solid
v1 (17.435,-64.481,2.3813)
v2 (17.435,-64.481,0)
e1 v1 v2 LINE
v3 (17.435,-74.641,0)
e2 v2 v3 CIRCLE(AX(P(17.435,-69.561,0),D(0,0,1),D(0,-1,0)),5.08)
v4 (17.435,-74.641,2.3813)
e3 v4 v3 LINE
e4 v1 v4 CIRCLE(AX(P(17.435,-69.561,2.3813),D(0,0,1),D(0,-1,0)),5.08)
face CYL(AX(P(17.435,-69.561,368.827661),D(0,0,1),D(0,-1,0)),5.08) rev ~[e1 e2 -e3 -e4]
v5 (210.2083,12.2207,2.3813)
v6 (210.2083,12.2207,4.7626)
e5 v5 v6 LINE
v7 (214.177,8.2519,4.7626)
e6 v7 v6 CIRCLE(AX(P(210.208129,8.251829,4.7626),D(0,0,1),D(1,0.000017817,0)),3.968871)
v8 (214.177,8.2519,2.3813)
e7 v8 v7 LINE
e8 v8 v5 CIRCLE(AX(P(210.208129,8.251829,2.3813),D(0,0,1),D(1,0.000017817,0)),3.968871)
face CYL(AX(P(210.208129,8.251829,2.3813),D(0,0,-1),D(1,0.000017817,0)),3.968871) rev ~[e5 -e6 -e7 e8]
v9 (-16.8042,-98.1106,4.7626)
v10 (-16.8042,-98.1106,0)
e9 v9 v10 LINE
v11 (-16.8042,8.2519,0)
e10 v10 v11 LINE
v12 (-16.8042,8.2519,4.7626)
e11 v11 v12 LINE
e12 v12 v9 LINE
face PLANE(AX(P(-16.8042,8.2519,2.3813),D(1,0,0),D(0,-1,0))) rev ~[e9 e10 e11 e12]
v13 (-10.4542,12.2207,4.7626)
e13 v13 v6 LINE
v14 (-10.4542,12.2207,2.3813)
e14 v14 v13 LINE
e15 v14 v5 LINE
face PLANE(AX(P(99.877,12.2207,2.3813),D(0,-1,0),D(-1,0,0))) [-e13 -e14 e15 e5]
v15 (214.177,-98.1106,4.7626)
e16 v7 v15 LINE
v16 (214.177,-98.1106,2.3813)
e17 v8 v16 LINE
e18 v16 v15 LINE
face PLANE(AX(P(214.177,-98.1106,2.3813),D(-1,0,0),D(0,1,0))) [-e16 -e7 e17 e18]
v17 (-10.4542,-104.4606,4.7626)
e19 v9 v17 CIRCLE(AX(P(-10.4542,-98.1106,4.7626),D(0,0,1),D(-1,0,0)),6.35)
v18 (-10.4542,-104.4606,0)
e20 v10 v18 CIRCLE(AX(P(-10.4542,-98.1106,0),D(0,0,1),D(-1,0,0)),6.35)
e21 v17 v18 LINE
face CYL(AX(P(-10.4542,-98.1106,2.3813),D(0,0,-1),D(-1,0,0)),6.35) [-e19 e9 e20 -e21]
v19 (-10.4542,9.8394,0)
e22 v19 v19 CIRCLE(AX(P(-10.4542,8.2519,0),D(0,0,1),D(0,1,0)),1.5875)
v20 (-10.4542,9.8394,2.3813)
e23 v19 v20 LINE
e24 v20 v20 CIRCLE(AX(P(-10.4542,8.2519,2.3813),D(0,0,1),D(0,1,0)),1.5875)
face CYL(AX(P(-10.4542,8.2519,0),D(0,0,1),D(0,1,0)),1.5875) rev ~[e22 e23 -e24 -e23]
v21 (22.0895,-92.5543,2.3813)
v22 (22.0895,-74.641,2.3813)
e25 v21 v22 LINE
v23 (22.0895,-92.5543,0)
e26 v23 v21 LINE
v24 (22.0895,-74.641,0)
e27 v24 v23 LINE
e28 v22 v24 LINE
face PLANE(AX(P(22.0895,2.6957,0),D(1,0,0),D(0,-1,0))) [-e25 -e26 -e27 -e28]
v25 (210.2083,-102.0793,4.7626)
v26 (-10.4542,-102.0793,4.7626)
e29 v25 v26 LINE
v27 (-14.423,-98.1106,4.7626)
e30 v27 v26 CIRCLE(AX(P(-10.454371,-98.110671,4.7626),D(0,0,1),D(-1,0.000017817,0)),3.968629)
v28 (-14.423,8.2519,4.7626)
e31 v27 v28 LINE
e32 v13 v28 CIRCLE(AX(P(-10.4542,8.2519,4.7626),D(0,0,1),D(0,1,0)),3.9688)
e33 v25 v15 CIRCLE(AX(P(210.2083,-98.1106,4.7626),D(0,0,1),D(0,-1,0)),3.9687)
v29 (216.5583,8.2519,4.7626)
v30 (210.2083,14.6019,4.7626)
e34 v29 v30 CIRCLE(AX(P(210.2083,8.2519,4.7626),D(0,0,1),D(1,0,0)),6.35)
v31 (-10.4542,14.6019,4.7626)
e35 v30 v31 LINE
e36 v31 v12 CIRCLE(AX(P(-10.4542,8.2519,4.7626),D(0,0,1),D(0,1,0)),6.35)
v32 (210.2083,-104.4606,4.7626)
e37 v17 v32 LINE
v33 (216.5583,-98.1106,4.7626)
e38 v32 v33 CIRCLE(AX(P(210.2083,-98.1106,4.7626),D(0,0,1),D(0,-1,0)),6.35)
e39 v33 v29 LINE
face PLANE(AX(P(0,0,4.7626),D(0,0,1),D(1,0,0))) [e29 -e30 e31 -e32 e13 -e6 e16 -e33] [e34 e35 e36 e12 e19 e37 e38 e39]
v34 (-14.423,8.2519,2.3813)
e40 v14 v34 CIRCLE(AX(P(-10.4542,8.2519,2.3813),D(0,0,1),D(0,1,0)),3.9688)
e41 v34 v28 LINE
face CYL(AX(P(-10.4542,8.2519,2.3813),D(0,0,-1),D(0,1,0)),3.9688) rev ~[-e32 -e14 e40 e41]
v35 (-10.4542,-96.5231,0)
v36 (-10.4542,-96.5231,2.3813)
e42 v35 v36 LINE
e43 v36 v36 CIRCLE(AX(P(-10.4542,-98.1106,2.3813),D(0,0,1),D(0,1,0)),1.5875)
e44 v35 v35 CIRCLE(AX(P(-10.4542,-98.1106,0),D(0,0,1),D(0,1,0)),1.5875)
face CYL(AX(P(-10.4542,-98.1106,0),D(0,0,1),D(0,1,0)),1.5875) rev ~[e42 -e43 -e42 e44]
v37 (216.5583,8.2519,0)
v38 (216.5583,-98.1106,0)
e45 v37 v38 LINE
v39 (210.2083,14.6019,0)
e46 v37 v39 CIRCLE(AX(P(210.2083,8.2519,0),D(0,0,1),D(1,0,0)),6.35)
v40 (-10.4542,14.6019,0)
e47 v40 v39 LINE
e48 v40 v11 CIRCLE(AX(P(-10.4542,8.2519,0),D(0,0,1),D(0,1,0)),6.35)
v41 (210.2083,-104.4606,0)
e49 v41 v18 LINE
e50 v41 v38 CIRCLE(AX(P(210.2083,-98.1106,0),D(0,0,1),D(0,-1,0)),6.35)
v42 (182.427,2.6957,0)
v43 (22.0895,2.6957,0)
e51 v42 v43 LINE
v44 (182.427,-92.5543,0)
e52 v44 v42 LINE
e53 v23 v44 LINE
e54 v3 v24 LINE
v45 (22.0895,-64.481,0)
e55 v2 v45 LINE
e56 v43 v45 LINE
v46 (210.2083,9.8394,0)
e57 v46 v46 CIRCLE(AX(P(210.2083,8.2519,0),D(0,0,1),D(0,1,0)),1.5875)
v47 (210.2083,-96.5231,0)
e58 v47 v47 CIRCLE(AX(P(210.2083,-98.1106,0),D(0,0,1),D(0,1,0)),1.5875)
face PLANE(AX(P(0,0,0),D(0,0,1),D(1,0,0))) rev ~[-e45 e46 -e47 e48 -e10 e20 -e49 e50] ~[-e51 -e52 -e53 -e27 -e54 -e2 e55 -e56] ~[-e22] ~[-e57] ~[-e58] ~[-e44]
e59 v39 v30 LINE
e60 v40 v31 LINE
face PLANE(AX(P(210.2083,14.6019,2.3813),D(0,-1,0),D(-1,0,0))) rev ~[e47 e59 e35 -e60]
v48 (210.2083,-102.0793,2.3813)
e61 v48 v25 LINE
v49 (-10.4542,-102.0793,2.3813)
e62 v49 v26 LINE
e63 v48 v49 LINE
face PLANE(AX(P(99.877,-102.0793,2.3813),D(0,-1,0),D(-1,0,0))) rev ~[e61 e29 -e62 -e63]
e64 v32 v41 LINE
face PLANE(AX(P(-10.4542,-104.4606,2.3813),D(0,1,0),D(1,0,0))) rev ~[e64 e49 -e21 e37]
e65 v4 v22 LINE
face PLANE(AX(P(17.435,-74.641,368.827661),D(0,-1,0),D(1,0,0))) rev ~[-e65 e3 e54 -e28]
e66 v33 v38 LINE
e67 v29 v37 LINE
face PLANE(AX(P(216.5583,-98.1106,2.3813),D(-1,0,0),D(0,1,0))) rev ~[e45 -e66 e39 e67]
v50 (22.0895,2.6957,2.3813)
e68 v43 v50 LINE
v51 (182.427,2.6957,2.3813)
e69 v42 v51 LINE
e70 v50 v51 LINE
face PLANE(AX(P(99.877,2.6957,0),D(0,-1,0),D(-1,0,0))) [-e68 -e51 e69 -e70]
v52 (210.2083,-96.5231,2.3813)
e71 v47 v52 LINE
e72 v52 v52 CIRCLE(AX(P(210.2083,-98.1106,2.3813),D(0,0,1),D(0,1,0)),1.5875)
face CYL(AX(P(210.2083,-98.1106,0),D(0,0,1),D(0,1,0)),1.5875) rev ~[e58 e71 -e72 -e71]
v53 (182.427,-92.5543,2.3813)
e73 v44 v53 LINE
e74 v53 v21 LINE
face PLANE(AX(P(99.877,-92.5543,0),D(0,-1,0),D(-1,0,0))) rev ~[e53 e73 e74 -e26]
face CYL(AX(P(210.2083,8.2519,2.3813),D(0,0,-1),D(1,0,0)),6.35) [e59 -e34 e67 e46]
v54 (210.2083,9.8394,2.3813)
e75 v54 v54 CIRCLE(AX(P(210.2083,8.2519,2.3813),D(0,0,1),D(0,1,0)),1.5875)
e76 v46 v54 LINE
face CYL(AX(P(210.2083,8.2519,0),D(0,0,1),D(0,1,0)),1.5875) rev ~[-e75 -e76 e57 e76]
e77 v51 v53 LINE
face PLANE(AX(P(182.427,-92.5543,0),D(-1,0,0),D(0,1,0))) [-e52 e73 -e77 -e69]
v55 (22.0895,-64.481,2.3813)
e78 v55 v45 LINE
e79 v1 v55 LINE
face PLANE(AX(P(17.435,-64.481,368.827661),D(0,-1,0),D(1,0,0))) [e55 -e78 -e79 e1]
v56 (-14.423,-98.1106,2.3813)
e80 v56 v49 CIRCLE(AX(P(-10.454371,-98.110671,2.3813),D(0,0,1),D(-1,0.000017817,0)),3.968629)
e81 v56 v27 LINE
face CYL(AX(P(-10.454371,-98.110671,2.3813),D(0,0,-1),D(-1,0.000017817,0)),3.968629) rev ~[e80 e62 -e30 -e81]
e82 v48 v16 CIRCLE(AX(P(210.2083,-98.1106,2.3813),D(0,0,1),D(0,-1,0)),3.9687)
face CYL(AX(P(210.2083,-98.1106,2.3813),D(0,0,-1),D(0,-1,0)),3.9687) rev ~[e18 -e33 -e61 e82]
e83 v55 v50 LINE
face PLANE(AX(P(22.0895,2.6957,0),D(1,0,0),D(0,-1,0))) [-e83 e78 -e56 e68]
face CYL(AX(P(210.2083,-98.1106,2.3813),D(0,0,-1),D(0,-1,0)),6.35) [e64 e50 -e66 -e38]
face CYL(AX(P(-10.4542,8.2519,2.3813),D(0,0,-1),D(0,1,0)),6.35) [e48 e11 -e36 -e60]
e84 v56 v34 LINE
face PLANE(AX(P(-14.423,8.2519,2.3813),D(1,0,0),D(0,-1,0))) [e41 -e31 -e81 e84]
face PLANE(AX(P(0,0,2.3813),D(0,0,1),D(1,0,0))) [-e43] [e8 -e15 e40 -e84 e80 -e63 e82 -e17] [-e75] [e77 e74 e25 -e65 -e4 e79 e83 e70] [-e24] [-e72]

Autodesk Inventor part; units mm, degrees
ref_plane "YZ Plane" through (0, 0, 0) normal (1, 0, 0) x (0, 1, 0)
ref_plane "XZ Plane" through (0, 0, 0) normal (0, 1, 0) x (-1, 0, 0)
ref_plane "XY Plane" through (0, 0, 0) normal (0, 0, 1) x (1, 0, 0)
sketch "Sketch1" plane through (0, 0, 0) normal (0, 0, 1) x (1, 0, 0)
  line L0 (-10.4542, 14.6019) -> (210.2083, 14.6019)
  line L1 (216.5583, 8.2519) -> (216.5583, -98.1106)
  line L2 (210.2083, -104.4606) -> (-10.4542, -104.4606)
  line L3 (-16.8042, -98.1106) -> (-16.8042, 8.2519)
  line L4 (99.877, 12.2207) -> (-10.4542, 12.2207)
  line L5 (-14.423, 8.2519) -> (-14.423, -44.9293)
  line L6 (99.877, 12.2207) -> (210.2083, 12.2207)
  line L7 (214.177, 8.2519) -> (214.177, -44.9293)
  line L8 (99.877, -102.0793) -> (210.2083, -102.0793)
  line L9 (214.177, -98.1106) -> (214.177, -44.9293)
  line L10 (99.877, -102.0793) -> (-10.4542, -102.0793)
  line L11 (-14.423, -98.1106) -> (-14.423, -44.9293)
  arc A0 (-10.4542, 14.6019) -> (-16.8042, 8.2519) centre (-10.4542, 8.2519) ccw
  arc A1 (216.5583, 8.2519) -> (210.2083, 14.6019) centre (210.2083, 8.2519) ccw
  arc A2 (210.2083, -104.4606) -> (216.5583, -98.1106) centre (210.2083, -98.1106) ccw
  arc A3 (-16.8042, -98.1106) -> (-10.4542, -104.4606) centre (-10.4542, -98.1106) ccw
  arc A4 (-10.4542, 12.2207) -> (-14.423, 8.2519) centre (-10.4542, 8.2519) ccw
  arc A5 (214.177, 8.2519) -> (210.2083, 12.2207) centre (210.2083, 8.2519) ccw
  arc A6 (210.2083, -102.0793) -> (214.177, -98.1106) centre (210.2083, -98.1106) ccw
  arc A7 (-14.423, -98.1106) -> (-10.4542, -102.0793) centre (-10.4542, -98.1106) ccw
  line L12 (99.877, 2.6957) -> (22.0895, 2.6957)
  line L13 (22.0895, 2.6957) -> (22.0895, -44.9293)
  line L14 (99.877, 2.6957) -> (182.427, 2.6957)
  line L15 (182.427, 2.6957) -> (182.427, -44.9293)
  line L16 (99.877, -92.5543) -> (182.427, -92.5543)
  line L17 (182.427, -92.5543) -> (182.427, -44.9293)
  line L18 (99.877, -92.5543) -> (22.0895, -92.5543)
  line L19 (22.0895, -92.5543) -> (22.0895, -44.9293)
  point P0 (0, 0)
  point P1 (-16.8042, 14.6019)
  point P2 (216.5583, -104.4606)
  point P3 (216.5583, 14.6019)
  point P4 (-16.8042, -104.4606)
  dimension "d0" = 233.3625
  dimension "d1" = 119.0625
  dimension "d9" = 6.35
  dimension "d10" = 3.9688
  dimension "d37" = 31.75
  dimension "d38" = 36.5125
  dimension "d39" = 9.525
  dimension "d40" = 9.525
extrude "Extrusion5" add sketch "Sketch1" along normal blind 2.3813 contours L0 A1 L1 A2 L2 A3 L3 A0 | L6 A5 L7 L9 A6 L8 L10 A7 L11 L5 A4 L4
sketch "Sketch6" plane through (0, 0, 2.3813) normal (0, 0, 1) x (1, 0, 0)
  line L0 (210.2083, 14.6019) -> (-10.4542, 14.6019) projected
  arc A0 (-10.4542, 14.6019) -> (-16.8042, 8.2519) centre (-10.4542, 8.2519) ccw projected
  line L1 (-16.8042, 8.2519) -> (-16.8042, -98.1106) projected
  arc A1 (-16.8042, -98.1106) -> (-10.4542, -104.4606) centre (-10.4542, -98.1106) ccw projected
  line L2 (-10.4542, -104.4606) -> (210.2083, -104.4606) projected
  arc A2 (210.2083, -104.4606) -> (216.5583, -98.1106) centre (210.2083, -98.1106) ccw projected
  line L3 (216.5583, -98.1106) -> (216.5583, 8.2519) projected
  arc A3 (216.5583, 8.2519) -> (210.2083, 14.6019) centre (210.2083, 8.2519) ccw projected
  line L4 (99.877, 12.2207) -> (-10.4542, 12.2207)
  line L5 (-14.423, 8.2519) -> (-14.423, -44.9293)
  line L6 (99.877, 12.2207) -> (210.2083, 12.2207)
  line L7 (214.177, 8.2519) -> (214.177, -44.9293)
  line L8 (99.877, -102.0793) -> (210.2083, -102.0793)
  line L9 (214.177, -98.1106) -> (214.177, -44.9293)
  line L10 (99.877, -102.0793) -> (-10.4542, -102.0793)
  line L11 (-14.423, -98.1106) -> (-14.423, -44.9293)
  arc A4 (-10.4542, 12.2207) -> (-14.423, 8.2519) centre (-10.4542, 8.2519) ccw
  arc A5 (214.177, 8.2519) -> (210.2083, 12.2207) centre (210.2083, 8.2519) ccw
  arc A6 (210.2083, -102.0793) -> (214.177, -98.1106) centre (210.2083, -98.1106) ccw
  arc A7 (-14.423, -98.1106) -> (-10.4542, -102.0793) centre (-10.4542, -98.1106) ccw
  point P0 (0, 0)
  dimension "d47" = 3.9688
extrude "Extrusion6" add sketch "Sketch6" along normal blind 2.3813
sketch "Sketch12" plane through (0, 0, 0) normal (0, 0, -1) x (-1, 0, 0)
  arc A0 (-210.2083, 14.6019) -> (-216.5583, 8.2519) centre (-210.2083, 8.2519) ccw projected
  arc A1 (-216.5583, -98.1106) -> (-210.2083, -104.4606) centre (-210.2083, -98.1106) ccw projected
  arc A2 (10.4542, -104.4606) -> (16.8042, -98.1106) centre (10.4542, -98.1106) ccw projected
  arc A3 (16.8042, 8.2519) -> (10.4542, 14.6019) centre (10.4542, 8.2519) ccw projected
  circle A4 centre (10.4542, 8.2519) radius 1.5875
  circle A5 centre (10.4542, -98.1106) radius 1.5875
  circle A6 centre (-210.2083, -98.1106) radius 1.5875
  circle A7 centre (-210.2083, 8.2519) radius 1.5875
  point P0 (0, 0)
  dimension "d64" = 3.175
  dimension "d65" = 3.175
  dimension "d66" = 3.175
  dimension "d67" = 3.175
hole "Hole2" at (210.2083, 8.2519, 0) at (-10.4542, 8.2519, 0) at (-10.4542, -98.1106, 0) at (210.2083, -98.1106, 0) direction (0, 0, 1) diameter 3.175 end through all
sketch "Sketch13" plane through (0, 0, 0) normal (0, 0, -1) x (-1, 0, 0)
  line L0 (-22.0895, 2.6957) -> (-22.0895, -92.5543) projected
  line L1 (16.8042, -98.1106) -> (16.8042, 8.2519) projected
  line L2 (16.8042, -89.9075) -> (-17.435, -89.9075)
  arc A0 (-17.435, -74.641) -> (-17.435, -64.481) centre (-17.435, -69.561) ccw
  line L3 (-17.435, -64.481) -> (-22.0895, -64.481)
  line L4 (-17.435, -74.641) -> (-22.0895, -74.641)
  line L5 (-22.0895, -64.481) -> (-22.0895, -74.641)
  point P0 (0, 0)
  dimension "d75" = 34.2392
split body "Split3" sketch "Sketch13" result one side removed curves L3 L5 L4 A0 removed pieces at (20.538, -71.2543, 0.5)
properties part number "Slave Tablet Cover"
